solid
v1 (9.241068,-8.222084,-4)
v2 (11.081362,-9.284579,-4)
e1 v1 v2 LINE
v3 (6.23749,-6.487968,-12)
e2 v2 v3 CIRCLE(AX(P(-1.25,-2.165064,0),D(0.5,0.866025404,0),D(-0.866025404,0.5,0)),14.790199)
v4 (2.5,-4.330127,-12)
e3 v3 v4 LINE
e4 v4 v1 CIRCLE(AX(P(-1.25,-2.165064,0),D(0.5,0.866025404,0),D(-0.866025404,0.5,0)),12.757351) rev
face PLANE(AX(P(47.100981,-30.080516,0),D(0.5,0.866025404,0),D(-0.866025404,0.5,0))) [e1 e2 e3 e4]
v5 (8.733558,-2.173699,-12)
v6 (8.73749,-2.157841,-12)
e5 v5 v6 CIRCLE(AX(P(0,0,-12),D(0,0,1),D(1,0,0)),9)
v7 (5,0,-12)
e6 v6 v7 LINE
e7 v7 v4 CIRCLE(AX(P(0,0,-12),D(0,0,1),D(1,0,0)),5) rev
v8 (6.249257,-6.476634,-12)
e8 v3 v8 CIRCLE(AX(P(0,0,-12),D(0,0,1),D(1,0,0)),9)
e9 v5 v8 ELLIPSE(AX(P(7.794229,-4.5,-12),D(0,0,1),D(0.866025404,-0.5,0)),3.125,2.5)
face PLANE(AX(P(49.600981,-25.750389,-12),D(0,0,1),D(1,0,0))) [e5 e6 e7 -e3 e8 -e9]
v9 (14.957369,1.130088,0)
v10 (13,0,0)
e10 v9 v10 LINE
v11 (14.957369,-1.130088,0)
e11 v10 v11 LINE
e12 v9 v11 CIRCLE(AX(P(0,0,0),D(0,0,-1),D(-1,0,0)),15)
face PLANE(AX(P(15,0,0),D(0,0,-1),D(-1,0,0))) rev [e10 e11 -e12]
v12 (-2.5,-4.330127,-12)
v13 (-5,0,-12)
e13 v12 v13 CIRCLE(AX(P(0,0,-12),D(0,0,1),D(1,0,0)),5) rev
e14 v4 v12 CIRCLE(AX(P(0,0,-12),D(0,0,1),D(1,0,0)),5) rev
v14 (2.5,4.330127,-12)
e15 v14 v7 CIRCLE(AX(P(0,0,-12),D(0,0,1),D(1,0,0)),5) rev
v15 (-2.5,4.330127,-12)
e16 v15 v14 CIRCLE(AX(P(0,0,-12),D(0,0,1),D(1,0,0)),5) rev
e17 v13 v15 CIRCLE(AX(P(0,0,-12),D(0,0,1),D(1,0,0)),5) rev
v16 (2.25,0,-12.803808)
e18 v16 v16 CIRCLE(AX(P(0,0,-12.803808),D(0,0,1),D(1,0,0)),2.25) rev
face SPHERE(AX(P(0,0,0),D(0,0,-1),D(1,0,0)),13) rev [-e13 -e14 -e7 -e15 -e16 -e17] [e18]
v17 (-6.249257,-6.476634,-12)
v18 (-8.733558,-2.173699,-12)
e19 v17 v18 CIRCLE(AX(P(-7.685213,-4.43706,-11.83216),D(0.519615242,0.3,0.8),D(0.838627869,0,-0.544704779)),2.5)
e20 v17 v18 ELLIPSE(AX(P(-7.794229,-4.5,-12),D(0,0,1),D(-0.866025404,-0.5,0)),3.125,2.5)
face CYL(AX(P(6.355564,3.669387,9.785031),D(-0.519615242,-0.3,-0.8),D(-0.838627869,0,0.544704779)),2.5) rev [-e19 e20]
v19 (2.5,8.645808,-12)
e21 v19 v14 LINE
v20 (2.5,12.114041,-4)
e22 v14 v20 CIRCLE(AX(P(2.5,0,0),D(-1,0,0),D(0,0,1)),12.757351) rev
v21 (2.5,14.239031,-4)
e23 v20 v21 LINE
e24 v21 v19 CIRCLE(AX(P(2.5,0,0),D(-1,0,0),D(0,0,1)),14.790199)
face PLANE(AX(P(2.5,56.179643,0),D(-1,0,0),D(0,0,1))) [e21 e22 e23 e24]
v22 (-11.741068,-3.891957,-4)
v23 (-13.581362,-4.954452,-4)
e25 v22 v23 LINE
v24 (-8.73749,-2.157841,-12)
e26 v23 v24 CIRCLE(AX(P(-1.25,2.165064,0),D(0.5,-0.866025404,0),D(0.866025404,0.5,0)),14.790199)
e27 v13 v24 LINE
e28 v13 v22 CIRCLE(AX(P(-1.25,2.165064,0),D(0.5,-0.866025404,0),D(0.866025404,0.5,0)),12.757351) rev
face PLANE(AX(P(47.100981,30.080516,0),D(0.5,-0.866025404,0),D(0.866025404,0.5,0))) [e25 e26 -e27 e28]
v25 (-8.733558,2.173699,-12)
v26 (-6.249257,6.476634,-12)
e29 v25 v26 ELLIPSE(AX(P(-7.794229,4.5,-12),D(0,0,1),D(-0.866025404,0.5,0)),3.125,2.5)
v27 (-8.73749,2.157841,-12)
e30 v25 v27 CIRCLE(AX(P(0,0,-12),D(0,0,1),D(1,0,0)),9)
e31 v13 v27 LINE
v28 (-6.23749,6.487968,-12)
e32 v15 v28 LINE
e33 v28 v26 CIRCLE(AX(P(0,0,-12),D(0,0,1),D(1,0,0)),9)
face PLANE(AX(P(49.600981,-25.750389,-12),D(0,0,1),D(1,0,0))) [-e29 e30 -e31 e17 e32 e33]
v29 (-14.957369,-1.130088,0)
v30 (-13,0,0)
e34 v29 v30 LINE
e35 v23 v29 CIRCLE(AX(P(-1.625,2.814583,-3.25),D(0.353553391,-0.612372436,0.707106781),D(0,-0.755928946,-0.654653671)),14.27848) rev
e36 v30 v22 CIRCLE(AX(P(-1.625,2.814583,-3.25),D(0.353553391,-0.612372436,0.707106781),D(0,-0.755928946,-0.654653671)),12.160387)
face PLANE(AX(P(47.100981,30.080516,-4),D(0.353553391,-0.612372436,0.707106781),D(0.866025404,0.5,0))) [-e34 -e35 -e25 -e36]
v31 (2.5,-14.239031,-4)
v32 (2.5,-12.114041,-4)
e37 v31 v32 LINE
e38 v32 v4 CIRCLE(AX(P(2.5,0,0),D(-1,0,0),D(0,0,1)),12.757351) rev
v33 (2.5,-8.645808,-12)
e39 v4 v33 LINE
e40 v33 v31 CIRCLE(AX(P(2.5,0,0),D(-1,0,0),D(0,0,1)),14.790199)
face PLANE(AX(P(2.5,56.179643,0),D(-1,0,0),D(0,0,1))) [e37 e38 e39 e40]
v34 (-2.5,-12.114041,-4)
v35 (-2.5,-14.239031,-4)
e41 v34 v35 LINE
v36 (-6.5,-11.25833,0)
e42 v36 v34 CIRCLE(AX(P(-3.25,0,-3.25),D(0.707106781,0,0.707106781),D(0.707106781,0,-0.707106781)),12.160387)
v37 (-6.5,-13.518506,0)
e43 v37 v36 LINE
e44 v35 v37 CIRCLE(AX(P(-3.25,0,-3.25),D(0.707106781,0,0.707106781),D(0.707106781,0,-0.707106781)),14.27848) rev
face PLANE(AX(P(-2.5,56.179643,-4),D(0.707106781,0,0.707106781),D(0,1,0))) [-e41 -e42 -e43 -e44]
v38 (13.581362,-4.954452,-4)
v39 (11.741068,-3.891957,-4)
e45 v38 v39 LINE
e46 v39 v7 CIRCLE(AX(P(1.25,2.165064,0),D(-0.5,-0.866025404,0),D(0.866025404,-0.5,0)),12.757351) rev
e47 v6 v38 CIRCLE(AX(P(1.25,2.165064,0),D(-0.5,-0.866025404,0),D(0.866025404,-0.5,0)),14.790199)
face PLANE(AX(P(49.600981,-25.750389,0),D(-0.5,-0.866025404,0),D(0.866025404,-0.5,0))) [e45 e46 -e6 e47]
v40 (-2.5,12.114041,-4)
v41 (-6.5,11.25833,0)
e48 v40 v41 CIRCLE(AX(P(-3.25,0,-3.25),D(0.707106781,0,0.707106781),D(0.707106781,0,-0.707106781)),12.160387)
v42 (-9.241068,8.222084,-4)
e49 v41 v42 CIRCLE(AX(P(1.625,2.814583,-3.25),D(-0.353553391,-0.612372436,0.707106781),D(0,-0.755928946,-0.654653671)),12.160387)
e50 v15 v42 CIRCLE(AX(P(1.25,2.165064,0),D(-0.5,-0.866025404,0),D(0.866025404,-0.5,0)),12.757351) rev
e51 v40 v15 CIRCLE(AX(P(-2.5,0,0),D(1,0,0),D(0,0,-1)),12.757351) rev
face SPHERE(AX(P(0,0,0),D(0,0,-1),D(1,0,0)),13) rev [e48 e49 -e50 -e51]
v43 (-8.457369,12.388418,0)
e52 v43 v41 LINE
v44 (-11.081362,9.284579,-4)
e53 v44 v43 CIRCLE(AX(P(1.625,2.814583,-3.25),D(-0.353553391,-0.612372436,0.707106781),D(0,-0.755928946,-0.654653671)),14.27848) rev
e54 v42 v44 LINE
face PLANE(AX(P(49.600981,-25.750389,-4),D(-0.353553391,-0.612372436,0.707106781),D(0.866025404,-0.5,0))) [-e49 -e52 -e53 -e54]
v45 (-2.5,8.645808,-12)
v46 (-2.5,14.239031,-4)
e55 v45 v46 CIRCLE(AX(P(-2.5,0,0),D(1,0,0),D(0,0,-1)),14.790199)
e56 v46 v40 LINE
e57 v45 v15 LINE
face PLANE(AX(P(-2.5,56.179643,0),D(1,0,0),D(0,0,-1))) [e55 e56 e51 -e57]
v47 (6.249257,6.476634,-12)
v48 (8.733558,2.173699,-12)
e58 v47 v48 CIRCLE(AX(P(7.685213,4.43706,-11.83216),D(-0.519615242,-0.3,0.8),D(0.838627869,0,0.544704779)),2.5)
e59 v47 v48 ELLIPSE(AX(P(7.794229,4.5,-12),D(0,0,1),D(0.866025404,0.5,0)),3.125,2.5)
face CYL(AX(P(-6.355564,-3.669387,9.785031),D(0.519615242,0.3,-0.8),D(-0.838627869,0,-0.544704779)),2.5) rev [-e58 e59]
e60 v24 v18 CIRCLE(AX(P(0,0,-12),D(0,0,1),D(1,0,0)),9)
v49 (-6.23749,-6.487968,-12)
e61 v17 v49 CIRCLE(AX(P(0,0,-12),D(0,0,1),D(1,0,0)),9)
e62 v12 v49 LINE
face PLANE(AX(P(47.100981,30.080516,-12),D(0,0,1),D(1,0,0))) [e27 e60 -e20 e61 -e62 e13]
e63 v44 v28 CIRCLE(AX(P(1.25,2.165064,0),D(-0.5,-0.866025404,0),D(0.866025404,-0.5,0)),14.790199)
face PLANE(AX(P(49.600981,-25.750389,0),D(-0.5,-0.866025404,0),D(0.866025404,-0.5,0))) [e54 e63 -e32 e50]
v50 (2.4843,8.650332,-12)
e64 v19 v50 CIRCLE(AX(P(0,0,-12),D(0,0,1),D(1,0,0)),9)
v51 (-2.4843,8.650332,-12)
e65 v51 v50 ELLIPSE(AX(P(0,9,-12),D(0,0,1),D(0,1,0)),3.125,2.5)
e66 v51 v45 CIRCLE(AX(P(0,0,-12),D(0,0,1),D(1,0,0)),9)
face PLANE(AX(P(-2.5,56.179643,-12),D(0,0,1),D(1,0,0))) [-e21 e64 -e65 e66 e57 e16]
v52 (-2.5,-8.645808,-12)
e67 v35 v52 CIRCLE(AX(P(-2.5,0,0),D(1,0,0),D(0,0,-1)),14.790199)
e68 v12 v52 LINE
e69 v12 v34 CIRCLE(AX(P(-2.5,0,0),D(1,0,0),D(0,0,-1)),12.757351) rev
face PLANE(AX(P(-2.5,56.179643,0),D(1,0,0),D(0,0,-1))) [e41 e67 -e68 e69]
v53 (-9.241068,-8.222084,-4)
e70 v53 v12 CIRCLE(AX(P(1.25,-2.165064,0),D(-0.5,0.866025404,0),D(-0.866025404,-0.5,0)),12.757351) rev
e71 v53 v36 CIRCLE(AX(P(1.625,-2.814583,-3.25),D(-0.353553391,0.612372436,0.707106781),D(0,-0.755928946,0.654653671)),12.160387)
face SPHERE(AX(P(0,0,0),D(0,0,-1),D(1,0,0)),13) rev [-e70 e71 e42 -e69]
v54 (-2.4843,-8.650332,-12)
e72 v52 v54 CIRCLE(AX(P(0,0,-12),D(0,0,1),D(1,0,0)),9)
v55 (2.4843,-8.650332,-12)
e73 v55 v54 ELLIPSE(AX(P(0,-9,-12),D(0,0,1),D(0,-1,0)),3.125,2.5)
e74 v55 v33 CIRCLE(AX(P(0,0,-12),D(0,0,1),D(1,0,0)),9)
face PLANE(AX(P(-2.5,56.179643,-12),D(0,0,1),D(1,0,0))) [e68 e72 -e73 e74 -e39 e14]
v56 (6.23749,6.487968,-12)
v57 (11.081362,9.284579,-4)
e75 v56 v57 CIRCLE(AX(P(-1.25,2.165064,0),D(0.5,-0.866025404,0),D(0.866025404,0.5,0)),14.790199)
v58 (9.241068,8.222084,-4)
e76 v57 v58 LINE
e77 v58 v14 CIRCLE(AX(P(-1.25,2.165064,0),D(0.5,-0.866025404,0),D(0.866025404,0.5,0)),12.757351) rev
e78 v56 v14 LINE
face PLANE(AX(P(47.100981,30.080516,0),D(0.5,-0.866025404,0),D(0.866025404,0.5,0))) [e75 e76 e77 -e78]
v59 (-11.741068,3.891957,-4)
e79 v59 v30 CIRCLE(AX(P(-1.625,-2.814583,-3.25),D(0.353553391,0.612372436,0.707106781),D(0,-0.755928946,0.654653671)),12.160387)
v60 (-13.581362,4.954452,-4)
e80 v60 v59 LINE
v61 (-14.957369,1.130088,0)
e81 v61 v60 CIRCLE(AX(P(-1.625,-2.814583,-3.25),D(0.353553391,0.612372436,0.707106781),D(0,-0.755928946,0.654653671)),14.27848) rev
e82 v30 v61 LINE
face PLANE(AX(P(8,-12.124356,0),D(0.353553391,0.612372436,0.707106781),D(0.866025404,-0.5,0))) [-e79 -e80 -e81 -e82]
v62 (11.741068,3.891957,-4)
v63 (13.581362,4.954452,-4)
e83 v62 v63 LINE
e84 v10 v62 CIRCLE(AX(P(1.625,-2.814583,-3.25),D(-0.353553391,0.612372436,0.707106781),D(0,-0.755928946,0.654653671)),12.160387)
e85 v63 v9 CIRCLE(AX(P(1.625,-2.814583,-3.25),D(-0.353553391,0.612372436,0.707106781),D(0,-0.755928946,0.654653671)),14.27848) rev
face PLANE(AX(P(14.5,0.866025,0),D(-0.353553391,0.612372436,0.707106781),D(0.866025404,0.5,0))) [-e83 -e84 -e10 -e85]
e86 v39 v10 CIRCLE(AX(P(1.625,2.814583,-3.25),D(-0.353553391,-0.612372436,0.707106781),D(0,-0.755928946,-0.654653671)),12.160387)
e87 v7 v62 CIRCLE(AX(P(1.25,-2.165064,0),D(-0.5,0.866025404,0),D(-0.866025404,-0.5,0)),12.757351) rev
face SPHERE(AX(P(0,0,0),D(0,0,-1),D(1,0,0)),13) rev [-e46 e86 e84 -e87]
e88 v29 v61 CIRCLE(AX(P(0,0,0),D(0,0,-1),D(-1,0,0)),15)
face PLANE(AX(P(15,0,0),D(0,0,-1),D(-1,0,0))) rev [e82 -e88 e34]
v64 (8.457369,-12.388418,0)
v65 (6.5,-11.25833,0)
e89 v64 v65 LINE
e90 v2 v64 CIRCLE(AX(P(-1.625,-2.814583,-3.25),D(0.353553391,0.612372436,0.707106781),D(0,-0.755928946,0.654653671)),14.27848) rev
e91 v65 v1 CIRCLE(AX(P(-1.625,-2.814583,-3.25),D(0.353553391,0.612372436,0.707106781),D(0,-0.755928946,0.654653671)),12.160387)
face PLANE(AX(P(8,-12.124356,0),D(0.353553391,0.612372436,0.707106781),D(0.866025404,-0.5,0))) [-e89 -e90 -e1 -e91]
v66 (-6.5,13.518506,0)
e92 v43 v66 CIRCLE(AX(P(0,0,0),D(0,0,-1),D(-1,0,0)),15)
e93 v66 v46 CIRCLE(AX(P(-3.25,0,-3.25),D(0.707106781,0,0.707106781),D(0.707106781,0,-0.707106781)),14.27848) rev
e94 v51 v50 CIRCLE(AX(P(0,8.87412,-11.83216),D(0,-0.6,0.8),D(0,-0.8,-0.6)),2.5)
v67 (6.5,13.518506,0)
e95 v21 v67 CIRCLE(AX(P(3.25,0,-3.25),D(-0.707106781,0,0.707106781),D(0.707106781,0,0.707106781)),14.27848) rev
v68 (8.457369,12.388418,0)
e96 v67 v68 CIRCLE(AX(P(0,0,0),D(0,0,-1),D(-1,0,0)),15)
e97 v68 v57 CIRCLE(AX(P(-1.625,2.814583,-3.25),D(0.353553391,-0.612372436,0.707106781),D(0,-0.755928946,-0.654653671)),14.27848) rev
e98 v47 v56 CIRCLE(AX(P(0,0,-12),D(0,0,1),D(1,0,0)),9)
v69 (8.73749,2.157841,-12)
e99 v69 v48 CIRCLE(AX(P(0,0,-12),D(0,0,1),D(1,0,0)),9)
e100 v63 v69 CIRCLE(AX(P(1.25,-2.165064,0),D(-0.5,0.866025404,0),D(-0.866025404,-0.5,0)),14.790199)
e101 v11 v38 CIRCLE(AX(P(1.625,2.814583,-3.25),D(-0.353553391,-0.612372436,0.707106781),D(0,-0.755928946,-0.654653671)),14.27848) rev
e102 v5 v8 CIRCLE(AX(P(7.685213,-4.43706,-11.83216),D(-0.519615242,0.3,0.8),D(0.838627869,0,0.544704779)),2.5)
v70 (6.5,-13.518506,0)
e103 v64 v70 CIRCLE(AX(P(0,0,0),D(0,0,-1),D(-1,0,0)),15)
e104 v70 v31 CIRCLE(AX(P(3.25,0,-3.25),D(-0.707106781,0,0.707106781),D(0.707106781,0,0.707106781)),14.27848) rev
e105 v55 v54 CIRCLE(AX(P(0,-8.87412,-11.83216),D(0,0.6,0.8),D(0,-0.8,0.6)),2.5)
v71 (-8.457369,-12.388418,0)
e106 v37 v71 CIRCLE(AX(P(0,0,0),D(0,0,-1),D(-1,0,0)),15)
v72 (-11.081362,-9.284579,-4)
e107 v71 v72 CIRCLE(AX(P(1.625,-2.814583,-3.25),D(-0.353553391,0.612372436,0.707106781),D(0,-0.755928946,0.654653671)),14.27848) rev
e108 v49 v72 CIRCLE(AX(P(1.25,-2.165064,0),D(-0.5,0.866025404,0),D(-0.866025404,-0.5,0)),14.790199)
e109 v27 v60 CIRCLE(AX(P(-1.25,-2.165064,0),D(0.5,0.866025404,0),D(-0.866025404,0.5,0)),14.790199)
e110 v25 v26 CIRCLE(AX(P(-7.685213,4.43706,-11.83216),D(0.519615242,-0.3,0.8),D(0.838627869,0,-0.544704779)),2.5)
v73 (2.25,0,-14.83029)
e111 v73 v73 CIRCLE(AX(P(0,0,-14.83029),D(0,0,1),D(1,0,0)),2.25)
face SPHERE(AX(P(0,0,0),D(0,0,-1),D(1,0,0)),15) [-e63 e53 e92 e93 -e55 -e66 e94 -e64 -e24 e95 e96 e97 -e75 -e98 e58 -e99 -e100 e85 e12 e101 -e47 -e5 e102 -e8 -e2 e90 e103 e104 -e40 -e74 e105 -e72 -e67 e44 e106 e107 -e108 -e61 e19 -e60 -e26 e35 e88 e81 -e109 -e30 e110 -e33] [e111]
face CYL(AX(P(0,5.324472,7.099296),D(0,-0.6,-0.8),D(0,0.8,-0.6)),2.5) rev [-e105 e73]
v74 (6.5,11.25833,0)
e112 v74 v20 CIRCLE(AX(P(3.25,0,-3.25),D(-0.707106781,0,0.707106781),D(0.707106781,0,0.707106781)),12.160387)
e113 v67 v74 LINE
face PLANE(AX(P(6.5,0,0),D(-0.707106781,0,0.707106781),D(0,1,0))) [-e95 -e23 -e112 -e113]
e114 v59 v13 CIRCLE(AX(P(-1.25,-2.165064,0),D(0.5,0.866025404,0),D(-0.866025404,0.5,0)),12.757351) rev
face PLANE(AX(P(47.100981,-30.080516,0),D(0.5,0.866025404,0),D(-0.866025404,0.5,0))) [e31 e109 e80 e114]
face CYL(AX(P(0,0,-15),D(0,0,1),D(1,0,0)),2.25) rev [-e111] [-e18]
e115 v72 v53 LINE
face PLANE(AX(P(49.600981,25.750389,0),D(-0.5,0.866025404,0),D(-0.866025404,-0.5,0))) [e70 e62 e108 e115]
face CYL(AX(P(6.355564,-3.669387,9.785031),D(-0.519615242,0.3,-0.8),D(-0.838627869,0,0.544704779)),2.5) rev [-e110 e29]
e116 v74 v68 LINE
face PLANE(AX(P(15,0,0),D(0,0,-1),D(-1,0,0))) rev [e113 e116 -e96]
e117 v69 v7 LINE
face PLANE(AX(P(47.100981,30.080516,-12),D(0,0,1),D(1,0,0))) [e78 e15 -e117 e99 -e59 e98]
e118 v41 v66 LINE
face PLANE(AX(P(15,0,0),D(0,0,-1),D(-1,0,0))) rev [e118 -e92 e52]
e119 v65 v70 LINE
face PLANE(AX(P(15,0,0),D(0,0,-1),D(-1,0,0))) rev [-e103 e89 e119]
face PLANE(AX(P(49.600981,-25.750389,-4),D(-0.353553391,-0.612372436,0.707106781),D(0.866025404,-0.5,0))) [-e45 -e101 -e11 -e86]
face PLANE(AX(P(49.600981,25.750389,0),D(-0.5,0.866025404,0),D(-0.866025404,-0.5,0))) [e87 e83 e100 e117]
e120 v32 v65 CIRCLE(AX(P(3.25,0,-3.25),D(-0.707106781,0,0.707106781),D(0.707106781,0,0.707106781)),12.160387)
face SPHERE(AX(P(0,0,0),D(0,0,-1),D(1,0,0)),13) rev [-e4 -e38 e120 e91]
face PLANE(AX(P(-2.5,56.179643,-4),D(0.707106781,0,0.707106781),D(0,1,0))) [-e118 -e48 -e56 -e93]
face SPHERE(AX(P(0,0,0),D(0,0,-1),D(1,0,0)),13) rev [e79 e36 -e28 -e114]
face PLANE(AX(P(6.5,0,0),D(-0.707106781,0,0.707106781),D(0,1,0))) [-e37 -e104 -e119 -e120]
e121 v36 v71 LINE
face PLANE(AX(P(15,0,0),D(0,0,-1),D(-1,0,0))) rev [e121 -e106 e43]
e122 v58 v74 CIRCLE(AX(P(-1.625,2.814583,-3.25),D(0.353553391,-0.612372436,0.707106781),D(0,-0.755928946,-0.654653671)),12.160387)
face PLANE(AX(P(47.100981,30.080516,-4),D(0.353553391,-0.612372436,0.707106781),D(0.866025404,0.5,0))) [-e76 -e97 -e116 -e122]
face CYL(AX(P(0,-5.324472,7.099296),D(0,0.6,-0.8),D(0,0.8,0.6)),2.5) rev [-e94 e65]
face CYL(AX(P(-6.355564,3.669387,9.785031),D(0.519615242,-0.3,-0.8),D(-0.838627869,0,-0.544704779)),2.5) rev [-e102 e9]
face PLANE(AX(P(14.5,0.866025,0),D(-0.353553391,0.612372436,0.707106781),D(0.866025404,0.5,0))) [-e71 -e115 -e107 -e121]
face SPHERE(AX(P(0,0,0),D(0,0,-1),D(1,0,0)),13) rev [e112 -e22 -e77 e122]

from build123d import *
from build123d.topology import SkipClean

# Parameters (mm, degrees)
CUT_EXTRUDE1_DEPTH      = 26.980762114
CUT_EXTRUDE1_DEPTH_BACK = 26.980762114
SKETCH2_R               = 2.25
CUT_EXTRUDE2_DEPTH      = 26.88315089
CUT_EXTRUDE3_DEPTH      = 31.577337854
CIRPATTERN1_COUNT       = 6
CHAMFER1_SIZE           = 4


with BuildPart() as part:
    # Sketch1 → Revolve1 (revolve)
    with BuildSketch(Plane(origin=(0, 0, 0), x_dir=(1, 0, 0), z_dir=(0, 1, 0))):
        with BuildLine():
            Line((0, 15), (0, 13))
            ThreePointArc((0, 13), (9.192388155, 9.192388155), (13, 0))
            Line((13, 0), (15, 0))
            ThreePointArc((15, 0), (10.606601718, 10.606601718), (0, 15))
        make_face()
    revolve(axis=Axis((0, 0, -15), (0, 0, 1)))

    # Sketch2 → Cut-Extrude1 (cut, two sides: drawn at the far end of the back side and taken through both)
    with BuildSketch(Plane.XY.offset(-CUT_EXTRUDE1_DEPTH_BACK)):
        Circle(SKETCH2_R)
    extrude(amount=CUT_EXTRUDE1_DEPTH + CUT_EXTRUDE1_DEPTH_BACK, mode=Mode.SUBTRACT)

    # Sketch3 → Cut-Extrude2 (cut, symmetric)
    with BuildSketch(Plane(origin=(0, 0, 0), x_dir=(1, 0, 0), z_dir=(0, 1, 0))):
        Polygon((-2.5, -55.877554425), (-2.5, 0), (-2.5, 12), (2.5, 12), (2.5, 0), (2.5, -55.877554425), (2.5, -167.632663274), (-2.5, -167.632663274), align=None)
    cut_extrude2 = extrude(amount=CUT_EXTRUDE2_DEPTH, both=True, mode=Mode.SUBTRACT)

    # Sketch5 → Cut-Extrude3 (cut, symmetric)
    with BuildSketch(Plane(origin=(0, 9, -12), x_dir=(-1, 0, 0), z_dir=(0, 0.6000000000000006, -0.7999999999999996))):
        with BuildLine():
            Line((-2.5, 0), (2.5, 0))
            ThreePointArc((2.5, 0), (0, -2.5), (-2.5, 0))
        make_face()
    cut_extrude3 = extrude(amount=CUT_EXTRUDE3_DEPTH, both=True, mode=Mode.SUBTRACT)

    # CirPattern1: Cut-Extrude2, Cut-Extrude3 ×6 about axis
    with SkipClean():  # the faces are left unmerged after this step: merging them gives an invalid solid
        cirpattern1_axis = Axis((0, 0, -15), (0, 0, 1))
        add([cut_extrude2.rotate(cirpattern1_axis, i * 360 / CIRPATTERN1_COUNT) for i in range(1, CIRPATTERN1_COUNT)], mode=Mode.SUBTRACT)
        add([cut_extrude3.rotate(cirpattern1_axis, i * 360 / CIRPATTERN1_COUNT) for i in range(1, CIRPATTERN1_COUNT)], mode=Mode.SUBTRACT)

    # Chamfer1
    chamfer1_edges = [part.edges().sort_by_distance(p)[0] for p in [
        (-2.5, -13.77377514, 0),
        (-2.5, 13.77377514, 0),
        (2.5, -13.77377514, 0),
        (2.5, 13.77377514, 0),
        (-13.178439177, 4.721824061, 0),
        (10.678439177, -9.051951079, 0),
        (13.178439177, -4.721824061, 0),
        (-10.678439177, 9.051951079, 0),
        (-10.678439177, -9.051951079, 0),
        (13.178439177, 4.721824061, 0),
        (10.678439177, 9.051951079, 0),
        (-13.178439177, -4.721824061, 0),
    ]]
    chamfer(chamfer1_edges, length=CHAMFER1_SIZE - 0.0001)  # a hair under: the kernel refuses the full size


solid = part.part
